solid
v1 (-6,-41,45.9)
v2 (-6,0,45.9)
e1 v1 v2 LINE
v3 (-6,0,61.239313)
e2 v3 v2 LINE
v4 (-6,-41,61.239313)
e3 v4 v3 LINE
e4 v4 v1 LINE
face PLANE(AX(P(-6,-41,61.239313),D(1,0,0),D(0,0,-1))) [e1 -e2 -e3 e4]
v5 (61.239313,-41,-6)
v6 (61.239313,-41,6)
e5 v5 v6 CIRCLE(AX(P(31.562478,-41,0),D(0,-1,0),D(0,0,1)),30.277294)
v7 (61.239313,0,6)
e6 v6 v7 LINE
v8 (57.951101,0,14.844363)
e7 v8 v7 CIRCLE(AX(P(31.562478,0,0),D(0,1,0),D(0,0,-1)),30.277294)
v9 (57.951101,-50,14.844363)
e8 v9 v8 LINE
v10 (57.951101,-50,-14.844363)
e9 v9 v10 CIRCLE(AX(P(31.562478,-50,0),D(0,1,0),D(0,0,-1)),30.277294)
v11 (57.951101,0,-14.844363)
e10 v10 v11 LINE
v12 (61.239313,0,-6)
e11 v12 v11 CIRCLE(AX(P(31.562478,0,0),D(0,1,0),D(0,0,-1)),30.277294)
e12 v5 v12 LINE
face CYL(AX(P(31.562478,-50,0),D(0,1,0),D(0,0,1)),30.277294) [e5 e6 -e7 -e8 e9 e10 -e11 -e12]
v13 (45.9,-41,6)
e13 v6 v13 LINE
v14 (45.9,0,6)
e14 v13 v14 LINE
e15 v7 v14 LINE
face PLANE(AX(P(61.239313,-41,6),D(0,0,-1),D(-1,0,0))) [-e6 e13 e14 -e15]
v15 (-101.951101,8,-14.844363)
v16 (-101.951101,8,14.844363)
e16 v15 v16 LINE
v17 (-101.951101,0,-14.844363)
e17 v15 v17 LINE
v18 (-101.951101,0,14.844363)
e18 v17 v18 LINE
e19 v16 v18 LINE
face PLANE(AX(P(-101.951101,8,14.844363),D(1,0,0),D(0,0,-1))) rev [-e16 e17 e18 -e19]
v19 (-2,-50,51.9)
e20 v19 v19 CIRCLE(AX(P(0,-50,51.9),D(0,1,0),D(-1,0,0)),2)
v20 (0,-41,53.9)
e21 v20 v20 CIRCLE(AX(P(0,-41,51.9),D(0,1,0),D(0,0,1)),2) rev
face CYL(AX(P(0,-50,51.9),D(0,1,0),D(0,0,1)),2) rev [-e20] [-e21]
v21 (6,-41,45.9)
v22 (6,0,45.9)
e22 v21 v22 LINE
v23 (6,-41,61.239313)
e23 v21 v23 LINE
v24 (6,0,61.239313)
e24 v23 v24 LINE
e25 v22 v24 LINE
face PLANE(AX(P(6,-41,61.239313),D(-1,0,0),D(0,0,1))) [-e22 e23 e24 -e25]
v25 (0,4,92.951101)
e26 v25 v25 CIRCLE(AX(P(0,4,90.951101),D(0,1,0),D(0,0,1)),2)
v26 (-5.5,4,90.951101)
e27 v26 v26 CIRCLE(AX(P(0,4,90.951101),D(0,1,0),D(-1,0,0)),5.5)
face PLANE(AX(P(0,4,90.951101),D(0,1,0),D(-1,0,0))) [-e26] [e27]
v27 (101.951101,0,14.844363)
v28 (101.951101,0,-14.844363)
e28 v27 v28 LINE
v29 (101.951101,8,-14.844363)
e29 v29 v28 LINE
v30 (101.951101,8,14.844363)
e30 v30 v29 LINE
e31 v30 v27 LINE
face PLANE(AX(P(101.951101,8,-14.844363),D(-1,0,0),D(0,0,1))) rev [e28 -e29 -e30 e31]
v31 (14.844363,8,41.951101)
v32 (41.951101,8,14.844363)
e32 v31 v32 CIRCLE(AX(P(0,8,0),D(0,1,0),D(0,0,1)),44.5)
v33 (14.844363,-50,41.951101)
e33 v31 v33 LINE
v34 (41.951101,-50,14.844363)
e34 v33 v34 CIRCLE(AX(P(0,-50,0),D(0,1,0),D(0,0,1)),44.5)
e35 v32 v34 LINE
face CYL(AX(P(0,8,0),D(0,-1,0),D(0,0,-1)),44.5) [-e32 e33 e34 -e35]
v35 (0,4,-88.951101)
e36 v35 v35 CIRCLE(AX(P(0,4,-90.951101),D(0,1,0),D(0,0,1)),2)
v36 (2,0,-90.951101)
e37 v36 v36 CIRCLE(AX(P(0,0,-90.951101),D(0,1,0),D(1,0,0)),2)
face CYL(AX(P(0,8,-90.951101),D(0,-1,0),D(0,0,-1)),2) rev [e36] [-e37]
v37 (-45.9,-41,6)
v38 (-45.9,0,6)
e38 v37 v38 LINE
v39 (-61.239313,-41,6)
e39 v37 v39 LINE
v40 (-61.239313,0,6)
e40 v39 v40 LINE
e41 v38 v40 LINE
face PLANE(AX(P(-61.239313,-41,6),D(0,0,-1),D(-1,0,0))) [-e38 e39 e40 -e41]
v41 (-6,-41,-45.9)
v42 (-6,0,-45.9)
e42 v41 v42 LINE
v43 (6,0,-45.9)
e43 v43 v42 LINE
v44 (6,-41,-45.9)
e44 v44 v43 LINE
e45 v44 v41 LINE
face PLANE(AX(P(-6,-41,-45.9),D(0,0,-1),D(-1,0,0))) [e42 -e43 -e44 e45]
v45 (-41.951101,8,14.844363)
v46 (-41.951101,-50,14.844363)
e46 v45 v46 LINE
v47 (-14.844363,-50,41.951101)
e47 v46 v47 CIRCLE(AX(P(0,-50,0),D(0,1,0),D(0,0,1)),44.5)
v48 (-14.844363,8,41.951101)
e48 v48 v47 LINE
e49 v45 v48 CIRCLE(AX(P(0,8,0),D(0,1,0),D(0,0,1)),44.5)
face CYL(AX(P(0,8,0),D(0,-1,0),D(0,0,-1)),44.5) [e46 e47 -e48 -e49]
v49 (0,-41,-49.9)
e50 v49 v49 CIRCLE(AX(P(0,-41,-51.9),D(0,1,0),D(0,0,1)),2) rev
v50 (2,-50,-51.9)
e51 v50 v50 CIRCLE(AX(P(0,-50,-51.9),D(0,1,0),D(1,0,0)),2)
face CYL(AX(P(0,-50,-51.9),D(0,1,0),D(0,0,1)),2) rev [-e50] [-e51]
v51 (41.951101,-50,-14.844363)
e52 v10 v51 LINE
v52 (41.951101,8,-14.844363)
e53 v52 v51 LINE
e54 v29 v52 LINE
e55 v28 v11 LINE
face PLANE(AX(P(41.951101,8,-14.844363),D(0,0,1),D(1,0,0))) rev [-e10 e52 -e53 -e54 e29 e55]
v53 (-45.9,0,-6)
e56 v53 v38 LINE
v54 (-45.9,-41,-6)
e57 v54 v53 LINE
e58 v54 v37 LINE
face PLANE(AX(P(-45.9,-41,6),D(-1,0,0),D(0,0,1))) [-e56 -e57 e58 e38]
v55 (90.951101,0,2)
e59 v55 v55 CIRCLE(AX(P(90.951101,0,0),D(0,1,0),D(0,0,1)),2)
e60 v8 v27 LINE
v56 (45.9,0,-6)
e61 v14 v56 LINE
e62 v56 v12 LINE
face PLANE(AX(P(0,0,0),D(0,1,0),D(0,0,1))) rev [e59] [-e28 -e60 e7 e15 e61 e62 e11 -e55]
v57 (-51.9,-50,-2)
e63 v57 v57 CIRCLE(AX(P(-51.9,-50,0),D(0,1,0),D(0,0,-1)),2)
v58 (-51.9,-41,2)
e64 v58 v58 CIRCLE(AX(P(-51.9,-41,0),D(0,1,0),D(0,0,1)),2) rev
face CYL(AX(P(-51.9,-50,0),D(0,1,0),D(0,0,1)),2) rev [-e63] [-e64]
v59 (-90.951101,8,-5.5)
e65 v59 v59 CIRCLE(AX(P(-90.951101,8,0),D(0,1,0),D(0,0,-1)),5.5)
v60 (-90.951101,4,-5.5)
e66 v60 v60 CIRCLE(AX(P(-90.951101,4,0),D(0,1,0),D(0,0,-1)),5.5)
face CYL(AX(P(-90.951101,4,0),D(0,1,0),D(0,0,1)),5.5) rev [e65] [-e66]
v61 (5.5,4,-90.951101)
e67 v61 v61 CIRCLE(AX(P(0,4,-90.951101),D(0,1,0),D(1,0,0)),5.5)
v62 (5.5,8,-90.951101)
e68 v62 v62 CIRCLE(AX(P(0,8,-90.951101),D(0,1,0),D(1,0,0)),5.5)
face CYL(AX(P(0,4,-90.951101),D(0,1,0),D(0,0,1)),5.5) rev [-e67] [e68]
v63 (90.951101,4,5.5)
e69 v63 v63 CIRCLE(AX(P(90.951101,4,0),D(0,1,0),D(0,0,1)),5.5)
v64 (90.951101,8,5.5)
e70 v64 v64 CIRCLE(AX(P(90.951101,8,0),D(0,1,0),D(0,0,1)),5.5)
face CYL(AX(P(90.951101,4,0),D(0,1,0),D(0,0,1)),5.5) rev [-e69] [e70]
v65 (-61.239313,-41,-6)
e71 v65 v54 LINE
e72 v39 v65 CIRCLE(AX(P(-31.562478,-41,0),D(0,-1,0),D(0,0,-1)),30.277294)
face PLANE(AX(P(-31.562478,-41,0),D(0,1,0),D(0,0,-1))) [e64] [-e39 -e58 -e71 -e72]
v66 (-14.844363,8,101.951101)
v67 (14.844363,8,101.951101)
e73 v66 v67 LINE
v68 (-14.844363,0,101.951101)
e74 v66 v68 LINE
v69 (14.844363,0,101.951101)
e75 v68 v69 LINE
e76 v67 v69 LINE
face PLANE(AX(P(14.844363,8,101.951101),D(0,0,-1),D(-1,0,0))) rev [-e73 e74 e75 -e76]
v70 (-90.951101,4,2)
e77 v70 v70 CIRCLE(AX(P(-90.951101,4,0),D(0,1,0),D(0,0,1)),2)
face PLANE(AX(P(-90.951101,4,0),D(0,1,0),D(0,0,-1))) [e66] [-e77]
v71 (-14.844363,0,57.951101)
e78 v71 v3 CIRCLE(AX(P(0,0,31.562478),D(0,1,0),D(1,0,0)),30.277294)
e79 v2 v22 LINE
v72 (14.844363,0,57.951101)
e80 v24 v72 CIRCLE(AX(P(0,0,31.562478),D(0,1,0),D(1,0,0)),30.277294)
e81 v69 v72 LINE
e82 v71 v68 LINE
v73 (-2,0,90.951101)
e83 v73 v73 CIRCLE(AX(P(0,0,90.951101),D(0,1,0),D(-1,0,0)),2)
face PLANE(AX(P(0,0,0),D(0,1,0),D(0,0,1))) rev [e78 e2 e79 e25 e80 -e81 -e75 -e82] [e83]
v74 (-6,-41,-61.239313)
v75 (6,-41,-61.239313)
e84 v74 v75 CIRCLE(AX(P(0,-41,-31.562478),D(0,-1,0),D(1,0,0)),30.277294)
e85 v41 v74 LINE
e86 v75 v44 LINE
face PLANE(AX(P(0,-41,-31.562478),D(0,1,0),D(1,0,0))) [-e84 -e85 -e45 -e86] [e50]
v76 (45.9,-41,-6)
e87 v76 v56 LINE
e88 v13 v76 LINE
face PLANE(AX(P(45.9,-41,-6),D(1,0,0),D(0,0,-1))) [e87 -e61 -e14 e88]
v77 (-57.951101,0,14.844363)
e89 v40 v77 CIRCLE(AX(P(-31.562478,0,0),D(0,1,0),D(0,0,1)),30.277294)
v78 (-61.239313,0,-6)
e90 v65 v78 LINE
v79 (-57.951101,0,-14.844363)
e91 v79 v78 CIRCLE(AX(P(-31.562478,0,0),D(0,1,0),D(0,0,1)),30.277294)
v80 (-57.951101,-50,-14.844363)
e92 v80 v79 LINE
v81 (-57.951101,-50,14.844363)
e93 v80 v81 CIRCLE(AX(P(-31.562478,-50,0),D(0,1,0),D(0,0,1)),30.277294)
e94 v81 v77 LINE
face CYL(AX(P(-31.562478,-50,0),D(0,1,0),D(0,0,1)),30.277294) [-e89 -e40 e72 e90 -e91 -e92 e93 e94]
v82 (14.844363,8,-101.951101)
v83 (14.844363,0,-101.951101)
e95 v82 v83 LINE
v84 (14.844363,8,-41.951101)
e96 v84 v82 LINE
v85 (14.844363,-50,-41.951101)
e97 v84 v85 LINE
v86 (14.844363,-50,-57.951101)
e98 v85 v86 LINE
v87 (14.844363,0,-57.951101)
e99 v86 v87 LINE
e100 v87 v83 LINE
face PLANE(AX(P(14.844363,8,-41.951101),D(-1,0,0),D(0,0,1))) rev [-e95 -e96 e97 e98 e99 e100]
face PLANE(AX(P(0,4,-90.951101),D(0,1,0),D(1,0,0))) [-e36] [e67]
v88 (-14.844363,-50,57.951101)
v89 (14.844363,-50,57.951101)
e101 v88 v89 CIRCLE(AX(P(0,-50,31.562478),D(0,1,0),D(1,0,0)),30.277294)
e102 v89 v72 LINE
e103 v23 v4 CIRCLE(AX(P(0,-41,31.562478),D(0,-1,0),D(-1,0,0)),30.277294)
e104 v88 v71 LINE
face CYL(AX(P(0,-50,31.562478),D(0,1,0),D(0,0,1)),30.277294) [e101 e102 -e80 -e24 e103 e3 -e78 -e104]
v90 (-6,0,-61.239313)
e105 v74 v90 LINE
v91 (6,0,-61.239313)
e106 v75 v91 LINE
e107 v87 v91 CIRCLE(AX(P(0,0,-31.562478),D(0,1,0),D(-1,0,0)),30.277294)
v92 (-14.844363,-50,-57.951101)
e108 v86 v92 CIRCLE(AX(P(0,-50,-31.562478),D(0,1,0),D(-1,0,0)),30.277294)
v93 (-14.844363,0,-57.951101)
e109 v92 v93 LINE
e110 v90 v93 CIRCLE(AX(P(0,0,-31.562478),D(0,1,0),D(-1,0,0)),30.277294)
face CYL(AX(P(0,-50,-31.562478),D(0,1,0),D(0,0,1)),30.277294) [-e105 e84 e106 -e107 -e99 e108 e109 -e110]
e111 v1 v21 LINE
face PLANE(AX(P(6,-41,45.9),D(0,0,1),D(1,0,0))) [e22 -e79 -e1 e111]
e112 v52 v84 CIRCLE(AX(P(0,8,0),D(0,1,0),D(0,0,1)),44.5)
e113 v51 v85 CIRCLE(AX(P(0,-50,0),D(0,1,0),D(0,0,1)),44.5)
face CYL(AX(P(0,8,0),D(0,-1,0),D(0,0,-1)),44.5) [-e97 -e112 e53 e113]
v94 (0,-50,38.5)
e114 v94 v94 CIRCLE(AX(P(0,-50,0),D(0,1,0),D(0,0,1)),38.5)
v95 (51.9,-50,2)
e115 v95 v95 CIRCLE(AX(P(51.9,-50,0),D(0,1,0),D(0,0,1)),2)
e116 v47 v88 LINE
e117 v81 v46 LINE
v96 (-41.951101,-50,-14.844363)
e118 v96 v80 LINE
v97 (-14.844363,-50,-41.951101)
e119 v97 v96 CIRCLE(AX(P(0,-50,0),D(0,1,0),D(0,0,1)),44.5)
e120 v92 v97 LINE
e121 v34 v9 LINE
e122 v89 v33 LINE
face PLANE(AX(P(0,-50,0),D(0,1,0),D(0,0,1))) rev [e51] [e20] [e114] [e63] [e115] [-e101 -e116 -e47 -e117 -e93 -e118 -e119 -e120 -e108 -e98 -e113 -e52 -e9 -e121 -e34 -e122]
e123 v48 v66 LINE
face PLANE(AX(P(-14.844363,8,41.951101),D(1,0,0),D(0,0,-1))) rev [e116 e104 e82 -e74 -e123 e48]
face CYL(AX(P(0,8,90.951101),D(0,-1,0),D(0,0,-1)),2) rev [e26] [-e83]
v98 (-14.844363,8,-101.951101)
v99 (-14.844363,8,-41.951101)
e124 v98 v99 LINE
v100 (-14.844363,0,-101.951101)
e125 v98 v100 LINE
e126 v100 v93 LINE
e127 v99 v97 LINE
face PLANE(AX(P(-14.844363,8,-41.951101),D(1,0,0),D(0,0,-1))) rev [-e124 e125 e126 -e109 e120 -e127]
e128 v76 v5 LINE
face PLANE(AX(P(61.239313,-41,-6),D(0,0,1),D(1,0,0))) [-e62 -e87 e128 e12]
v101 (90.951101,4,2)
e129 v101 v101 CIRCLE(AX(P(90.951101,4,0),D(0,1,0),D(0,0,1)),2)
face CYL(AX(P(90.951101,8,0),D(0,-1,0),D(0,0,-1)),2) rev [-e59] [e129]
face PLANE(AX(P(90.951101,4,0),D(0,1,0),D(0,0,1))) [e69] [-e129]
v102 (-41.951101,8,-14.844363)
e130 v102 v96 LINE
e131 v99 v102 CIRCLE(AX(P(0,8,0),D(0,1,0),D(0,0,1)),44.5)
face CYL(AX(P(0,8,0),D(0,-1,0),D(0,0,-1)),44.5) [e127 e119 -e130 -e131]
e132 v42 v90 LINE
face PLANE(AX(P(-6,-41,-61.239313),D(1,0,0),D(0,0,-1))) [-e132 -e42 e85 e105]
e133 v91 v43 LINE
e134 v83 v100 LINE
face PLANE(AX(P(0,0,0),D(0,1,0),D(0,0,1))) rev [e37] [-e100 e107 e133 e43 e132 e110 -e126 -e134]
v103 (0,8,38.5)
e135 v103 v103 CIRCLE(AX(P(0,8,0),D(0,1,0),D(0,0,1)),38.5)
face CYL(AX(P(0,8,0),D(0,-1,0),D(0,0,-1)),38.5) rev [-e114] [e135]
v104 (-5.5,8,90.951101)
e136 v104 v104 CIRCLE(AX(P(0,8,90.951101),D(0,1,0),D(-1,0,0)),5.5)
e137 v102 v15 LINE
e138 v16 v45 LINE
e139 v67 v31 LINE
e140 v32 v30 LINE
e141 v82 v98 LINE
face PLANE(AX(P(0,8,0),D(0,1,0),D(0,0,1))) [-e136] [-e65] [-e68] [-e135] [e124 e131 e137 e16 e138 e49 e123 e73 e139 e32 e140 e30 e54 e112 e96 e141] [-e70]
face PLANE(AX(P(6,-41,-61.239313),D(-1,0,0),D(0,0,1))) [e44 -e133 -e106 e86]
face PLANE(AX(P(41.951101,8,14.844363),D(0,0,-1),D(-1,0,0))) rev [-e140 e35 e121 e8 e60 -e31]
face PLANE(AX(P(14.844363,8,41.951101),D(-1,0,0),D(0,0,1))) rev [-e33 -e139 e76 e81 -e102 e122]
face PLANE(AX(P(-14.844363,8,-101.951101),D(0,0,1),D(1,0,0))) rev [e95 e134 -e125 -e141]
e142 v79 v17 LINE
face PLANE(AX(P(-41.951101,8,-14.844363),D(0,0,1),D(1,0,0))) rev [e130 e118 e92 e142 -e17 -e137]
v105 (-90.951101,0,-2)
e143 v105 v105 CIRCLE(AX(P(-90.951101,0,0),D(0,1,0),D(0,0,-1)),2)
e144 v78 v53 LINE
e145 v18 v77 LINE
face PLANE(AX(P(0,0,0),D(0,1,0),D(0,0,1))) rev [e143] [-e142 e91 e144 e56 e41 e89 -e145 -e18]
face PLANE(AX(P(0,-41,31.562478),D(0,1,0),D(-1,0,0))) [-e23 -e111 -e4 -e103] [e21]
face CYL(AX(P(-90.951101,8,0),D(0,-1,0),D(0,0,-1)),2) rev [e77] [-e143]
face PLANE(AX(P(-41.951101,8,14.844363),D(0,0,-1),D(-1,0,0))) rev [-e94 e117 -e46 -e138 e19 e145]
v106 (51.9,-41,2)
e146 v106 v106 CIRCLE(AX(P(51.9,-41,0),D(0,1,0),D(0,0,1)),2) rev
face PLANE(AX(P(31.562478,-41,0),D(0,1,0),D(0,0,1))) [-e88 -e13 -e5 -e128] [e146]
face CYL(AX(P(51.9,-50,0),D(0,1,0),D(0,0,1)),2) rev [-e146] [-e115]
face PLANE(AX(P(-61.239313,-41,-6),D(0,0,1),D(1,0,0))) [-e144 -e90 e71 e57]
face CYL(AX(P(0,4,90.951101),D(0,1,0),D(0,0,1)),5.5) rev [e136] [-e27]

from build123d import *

# Parameters (mm, degrees)
SKETCH1_R           = 44.5
SKETCH1_R_2         = 38.5
BOSS_EXTRUDE1_DEPTH = 8
SKETCH2_R           = 2
BOSS_EXTRUDE2_DEPTH = 8
CIRPATTERN3_COUNT   = 4
BOSS_EXTRUDE3_START = -50
SKETCH5_R           = 44.5
SKETCH5_R_2         = 38.5
BOSS_EXTRUDE3_DEPTH = 50
BOSS_EXTRUDE4_START = -50
SKETCH7_R           = 2
BOSS_EXTRUDE4_DEPTH = 50
CIRPATTERN4_COUNT   = 4
CUT_EXTRUDE2_START  = 41
CUT_EXTRUDE2_DEPTH  = 41
CIRPATTERN5_COUNT   = 4
SKETCH9_R           = 5.5
CUT_EXTRUDE3_DEPTH  = 4
CIRPATTERN6_COUNT   = 4


with BuildPart() as part:
    # Sketch1 → Boss-Extrude1 (new body)
    with BuildSketch(Plane(origin=(0, 0, 0), x_dir=(1, 0, 0), z_dir=(0, 1, 0))):
        Circle(SKETCH1_R)
        Circle(SKETCH1_R_2, mode=Mode.SUBTRACT)
    extrude(amount=BOSS_EXTRUDE1_DEPTH)

    # Sketch2 → Boss-Extrude2 (add)
    with BuildSketch(Plane(origin=(0, 0, 0), x_dir=(1, 0, 0), z_dir=(0, 1, 0))):
        with BuildLine():
            Line((41.951101238, 14.844362731), (101.951101238, 14.844362731))
            Line((101.951101238, 14.844362731), (101.951101238, -14.844362731))
            Line((101.951101238, -14.844362731), (41.951101238, -14.844362731))
            ThreePointArc((41.951101238, -14.844362731), (44.5, 0), (41.951101238, 14.844362731))
        make_face()
        with Locations((90.951101238, 0)):
            Circle(SKETCH2_R, mode=Mode.SUBTRACT)
    boss_extrude2 = extrude(amount=BOSS_EXTRUDE2_DEPTH)

    # CirPattern3: Boss-Extrude2 ×4 about axis
    cirpattern3_axis = Axis((0, 8, 0), (0, -1, 0))
    for i in range(1, CIRPATTERN3_COUNT):
        add(boss_extrude2.rotate(cirpattern3_axis, i * 360 / CIRPATTERN3_COUNT))

    # Sketch5 → Boss-Extrude3 (add)
    with BuildSketch(Plane(origin=(0, 0, 0), x_dir=(1, 0, 0), z_dir=(0, 1, 0)).offset(BOSS_EXTRUDE3_START)):
        Circle(SKETCH5_R)
        Circle(SKETCH5_R_2, mode=Mode.SUBTRACT)
    extrude(amount=BOSS_EXTRUDE3_DEPTH)

    # Sketch7 → Boss-Extrude4 (add)
    with BuildSketch(Plane(origin=(0, 0, 0), x_dir=(1, 0, 0), z_dir=(0, 1, 0)).offset(BOSS_EXTRUDE4_START)):
        with BuildLine():
            Line((41.951101238, 14.844362731), (57.951101238, 14.844362731))
            ThreePointArc((57.951101238, 14.844362731), (61.83977211, 0), (57.951101238, -14.844362731))
            Line((57.951101238, -14.844362731), (41.951101238, -14.844362731))
            ThreePointArc((41.951101238, -14.844362731), (44.5, 0), (41.951101238, 14.844362731))
        make_face()
        with Locations((51.9, 0)):
            Circle(SKETCH7_R, mode=Mode.SUBTRACT)
    boss_extrude4 = extrude(amount=BOSS_EXTRUDE4_DEPTH)

    # CirPattern4: Boss-Extrude4 ×4 about axis
    cirpattern4_axis = Axis((0, 8, 0), (0, -1, 0))
    for i in range(1, CIRPATTERN4_COUNT):
        add(boss_extrude4.rotate(cirpattern4_axis, i * 360 / CIRPATTERN4_COUNT))

    # Sketch8 → Cut-Extrude2 (cut)
    with BuildSketch(Plane.XZ.offset(CUT_EXTRUDE2_START)):
        with BuildLine():
            Line((61.239313057, -6), (45.9, -6))
            Line((45.9, -6), (45.9, 6))
            Line((45.9, 6), (61.239313057, 6))
            ThreePointArc((61.239313057, 6), (61.83977211, 0), (61.239313057, -6))
        make_face()
    cut_extrude2 = extrude(amount=-CUT_EXTRUDE2_DEPTH, mode=Mode.SUBTRACT)

    # CirPattern5: Cut-Extrude2 ×4 about axis
    cirpattern5_axis = Axis((0, 8, 0), (0, -1, 0))
    for i in range(1, CIRPATTERN5_COUNT):
        add(cut_extrude2.rotate(cirpattern5_axis, i * 360 / CIRPATTERN5_COUNT), mode=Mode.SUBTRACT)

    # Sketch9 → Cut-Extrude3 (cut)
    with BuildSketch(Plane(origin=(0, 8, 0), x_dir=(1, 0, 0), z_dir=(0, 1, 0))):
        with Locations((90.951101238, 0)):
            Circle(SKETCH9_R)
    cut_extrude3 = extrude(amount=-CUT_EXTRUDE3_DEPTH, mode=Mode.SUBTRACT)

    # CirPattern6: Cut-Extrude3 ×4 about axis
    cirpattern6_axis = Axis((0, 8, 0), (0, -1, 0))
    for i in range(1, CIRPATTERN6_COUNT):
        add(cut_extrude3.rotate(cirpattern6_axis, i * 360 / CIRPATTERN6_COUNT), mode=Mode.SUBTRACT)


solid = part.part
